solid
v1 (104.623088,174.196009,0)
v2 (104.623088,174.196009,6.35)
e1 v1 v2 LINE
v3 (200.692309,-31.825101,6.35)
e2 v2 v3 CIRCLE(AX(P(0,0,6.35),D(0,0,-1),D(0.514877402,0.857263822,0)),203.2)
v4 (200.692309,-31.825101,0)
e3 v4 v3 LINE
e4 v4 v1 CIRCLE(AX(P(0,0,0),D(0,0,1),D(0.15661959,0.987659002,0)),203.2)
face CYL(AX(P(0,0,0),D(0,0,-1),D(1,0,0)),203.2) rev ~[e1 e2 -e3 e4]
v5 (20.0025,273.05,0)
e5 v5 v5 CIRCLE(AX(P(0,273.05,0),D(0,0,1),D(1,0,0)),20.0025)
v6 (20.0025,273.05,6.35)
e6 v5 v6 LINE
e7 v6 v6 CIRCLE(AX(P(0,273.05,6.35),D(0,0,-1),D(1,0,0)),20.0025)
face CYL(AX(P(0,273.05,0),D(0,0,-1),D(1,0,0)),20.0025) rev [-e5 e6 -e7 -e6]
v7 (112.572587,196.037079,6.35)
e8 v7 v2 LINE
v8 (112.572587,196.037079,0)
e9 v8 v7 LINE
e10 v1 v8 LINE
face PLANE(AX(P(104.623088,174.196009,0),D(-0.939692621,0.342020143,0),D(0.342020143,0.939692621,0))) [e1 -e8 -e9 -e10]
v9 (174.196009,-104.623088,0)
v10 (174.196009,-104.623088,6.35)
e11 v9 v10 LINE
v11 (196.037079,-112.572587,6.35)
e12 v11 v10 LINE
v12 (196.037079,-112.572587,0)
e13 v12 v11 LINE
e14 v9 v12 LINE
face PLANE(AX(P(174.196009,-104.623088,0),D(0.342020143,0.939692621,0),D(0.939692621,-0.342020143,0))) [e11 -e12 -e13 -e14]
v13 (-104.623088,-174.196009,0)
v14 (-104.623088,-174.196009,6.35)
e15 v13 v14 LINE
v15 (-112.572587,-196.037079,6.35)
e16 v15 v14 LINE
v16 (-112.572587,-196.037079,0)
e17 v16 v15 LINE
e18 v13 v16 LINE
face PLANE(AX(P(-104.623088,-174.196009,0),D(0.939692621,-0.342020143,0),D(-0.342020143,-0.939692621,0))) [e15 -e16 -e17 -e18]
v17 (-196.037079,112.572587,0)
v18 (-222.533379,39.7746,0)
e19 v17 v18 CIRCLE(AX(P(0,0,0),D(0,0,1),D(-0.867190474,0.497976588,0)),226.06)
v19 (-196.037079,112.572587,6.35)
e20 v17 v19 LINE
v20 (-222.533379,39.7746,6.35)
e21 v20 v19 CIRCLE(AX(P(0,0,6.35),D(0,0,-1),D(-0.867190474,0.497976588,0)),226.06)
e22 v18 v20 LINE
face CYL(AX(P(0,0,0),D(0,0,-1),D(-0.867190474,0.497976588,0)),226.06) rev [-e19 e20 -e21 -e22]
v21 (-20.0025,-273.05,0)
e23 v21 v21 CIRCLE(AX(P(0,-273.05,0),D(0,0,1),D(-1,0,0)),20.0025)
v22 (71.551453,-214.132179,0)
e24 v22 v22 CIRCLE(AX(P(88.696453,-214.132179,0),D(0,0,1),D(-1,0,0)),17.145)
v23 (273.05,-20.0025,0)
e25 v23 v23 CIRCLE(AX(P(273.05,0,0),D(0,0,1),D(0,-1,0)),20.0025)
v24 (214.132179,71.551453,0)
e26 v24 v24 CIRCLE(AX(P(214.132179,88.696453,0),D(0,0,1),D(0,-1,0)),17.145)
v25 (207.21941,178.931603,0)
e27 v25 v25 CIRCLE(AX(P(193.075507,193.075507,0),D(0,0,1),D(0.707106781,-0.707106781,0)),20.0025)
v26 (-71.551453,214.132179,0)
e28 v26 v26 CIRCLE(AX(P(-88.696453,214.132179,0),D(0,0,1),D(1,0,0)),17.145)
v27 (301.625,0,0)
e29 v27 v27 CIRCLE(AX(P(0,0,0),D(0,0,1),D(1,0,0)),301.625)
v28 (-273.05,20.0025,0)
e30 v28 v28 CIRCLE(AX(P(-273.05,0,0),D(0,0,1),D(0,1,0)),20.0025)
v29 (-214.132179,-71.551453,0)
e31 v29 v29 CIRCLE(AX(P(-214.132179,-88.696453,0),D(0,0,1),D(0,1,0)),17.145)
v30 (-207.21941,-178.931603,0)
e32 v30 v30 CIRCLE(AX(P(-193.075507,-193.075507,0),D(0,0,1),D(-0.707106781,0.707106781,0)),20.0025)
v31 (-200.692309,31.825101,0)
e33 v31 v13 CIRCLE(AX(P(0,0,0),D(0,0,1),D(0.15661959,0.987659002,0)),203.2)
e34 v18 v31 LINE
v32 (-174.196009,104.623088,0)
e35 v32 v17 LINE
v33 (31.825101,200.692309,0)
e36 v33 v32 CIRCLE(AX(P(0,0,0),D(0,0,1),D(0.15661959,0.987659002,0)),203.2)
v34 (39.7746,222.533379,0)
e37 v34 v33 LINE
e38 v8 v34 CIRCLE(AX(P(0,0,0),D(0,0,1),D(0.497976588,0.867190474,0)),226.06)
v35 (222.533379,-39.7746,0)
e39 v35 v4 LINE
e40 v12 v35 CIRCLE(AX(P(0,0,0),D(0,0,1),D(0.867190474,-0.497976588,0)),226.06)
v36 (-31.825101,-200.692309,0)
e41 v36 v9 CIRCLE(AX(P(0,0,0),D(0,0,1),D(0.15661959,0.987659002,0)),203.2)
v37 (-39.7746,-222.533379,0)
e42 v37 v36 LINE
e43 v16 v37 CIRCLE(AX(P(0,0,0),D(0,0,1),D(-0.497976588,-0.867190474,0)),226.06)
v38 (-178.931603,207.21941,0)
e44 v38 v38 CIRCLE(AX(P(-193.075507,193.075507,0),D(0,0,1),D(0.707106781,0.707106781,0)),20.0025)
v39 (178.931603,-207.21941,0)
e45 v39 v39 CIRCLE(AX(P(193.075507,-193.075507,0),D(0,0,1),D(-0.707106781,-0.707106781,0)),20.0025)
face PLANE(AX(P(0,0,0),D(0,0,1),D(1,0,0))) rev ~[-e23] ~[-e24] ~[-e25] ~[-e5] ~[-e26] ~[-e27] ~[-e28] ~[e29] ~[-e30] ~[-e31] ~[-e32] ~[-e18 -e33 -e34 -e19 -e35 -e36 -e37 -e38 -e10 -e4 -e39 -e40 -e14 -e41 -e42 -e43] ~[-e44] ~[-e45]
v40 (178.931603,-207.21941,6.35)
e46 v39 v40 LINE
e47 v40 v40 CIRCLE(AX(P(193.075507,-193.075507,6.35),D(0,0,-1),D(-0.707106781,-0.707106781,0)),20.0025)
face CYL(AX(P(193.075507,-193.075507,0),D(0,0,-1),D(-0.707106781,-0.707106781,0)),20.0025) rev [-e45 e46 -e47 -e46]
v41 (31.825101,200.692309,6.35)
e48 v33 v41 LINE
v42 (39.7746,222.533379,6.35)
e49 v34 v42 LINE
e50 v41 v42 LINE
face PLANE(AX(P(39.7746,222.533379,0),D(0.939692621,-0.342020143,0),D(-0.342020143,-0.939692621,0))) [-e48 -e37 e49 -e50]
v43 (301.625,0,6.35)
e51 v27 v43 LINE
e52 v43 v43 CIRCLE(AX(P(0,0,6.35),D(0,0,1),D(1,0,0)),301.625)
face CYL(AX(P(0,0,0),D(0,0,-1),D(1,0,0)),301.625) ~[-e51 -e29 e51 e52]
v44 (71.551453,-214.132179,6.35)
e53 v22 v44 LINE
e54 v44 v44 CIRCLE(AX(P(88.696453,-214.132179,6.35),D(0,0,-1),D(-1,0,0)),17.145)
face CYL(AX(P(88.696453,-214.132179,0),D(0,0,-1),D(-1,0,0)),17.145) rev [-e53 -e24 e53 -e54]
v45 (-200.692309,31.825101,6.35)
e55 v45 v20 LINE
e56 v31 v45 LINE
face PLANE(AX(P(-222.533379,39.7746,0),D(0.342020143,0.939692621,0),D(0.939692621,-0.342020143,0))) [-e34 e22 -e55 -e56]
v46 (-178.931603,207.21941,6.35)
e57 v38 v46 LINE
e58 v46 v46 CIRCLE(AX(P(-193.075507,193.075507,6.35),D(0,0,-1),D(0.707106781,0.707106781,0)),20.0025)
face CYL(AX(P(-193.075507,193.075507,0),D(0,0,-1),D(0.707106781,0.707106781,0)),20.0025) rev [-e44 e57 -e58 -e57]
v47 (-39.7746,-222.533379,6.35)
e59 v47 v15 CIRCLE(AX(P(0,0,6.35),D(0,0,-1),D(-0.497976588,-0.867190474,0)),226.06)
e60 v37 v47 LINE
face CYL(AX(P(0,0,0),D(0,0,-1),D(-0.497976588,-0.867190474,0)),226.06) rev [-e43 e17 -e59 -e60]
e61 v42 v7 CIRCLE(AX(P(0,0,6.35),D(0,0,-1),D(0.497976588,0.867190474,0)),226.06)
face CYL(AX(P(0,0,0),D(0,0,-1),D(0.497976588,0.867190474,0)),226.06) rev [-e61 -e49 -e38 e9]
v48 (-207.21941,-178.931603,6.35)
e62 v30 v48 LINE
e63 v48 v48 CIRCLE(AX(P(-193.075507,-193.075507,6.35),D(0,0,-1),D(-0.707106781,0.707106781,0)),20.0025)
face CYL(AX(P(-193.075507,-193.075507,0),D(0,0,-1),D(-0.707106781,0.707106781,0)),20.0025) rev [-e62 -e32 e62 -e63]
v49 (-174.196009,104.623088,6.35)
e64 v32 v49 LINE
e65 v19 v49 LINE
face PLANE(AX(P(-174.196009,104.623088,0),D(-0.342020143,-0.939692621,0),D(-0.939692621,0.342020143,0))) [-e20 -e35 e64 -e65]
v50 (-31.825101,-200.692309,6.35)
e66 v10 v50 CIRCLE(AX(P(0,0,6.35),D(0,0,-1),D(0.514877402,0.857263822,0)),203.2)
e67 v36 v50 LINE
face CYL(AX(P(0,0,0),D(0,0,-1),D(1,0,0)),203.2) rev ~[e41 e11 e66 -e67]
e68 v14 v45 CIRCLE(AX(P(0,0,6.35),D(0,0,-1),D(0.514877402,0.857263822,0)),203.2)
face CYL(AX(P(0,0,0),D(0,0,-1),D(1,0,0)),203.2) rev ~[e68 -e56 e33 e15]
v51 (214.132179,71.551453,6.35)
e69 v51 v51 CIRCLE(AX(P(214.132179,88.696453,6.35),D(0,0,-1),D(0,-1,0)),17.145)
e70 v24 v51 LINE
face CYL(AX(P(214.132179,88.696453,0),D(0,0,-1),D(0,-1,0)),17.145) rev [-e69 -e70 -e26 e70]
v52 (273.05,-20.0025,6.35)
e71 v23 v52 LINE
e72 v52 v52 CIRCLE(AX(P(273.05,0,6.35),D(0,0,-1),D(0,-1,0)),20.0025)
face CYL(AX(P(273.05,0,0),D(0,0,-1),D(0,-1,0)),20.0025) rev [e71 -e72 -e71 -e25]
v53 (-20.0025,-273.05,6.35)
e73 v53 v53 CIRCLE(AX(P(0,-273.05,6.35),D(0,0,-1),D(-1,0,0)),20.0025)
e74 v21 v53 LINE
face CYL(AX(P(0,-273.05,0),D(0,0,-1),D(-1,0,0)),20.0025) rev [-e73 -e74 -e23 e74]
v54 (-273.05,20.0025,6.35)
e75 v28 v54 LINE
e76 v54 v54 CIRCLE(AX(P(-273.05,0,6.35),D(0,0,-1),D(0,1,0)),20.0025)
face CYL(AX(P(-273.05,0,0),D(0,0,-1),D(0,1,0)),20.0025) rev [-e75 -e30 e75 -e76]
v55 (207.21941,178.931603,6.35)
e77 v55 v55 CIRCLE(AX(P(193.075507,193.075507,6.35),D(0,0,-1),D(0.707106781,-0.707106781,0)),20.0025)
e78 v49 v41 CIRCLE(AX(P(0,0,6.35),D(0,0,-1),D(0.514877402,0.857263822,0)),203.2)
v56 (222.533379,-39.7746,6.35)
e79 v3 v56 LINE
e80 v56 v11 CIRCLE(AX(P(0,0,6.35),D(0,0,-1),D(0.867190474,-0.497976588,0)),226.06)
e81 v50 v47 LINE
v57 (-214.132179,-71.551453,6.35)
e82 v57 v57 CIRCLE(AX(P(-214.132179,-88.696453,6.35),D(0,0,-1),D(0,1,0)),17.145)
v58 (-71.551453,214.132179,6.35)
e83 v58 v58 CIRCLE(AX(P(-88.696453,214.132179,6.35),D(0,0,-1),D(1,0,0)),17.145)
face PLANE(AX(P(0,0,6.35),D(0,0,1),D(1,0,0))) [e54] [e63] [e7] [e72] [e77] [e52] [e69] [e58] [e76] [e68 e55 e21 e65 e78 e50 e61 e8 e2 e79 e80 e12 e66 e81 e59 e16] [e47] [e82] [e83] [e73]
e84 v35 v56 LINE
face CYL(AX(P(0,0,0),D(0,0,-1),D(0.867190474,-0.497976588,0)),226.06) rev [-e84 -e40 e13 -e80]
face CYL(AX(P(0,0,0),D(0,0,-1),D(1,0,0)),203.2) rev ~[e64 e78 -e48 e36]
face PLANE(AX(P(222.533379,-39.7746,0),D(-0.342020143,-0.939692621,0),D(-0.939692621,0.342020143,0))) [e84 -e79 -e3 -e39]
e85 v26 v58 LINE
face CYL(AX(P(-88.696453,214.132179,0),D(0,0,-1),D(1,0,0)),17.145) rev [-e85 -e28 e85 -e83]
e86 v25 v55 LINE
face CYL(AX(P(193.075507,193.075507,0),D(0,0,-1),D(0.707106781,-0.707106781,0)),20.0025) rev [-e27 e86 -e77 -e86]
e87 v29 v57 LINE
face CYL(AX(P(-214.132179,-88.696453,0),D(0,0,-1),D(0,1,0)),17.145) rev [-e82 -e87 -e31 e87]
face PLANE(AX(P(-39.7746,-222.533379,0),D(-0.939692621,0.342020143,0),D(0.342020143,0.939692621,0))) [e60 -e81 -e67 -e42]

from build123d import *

# Parameters (mm, degrees)
F0_R            = 301.625
F0_R_2          = 17.145
F0_R_3          = 20.0025
F1_DEPTH        = 6.35
F2_DEPTH        = 6.351
F2_COPIES_COUNT = 8
F3_DEPTH        = 6.351
F3_COPIES_COUNT = 4
F4_DEPTH        = 6.351
F4_COPIES_COUNT = 4


# Not quite as in the source:
# - a pattern or mirror of a feature is missing from the dataset's text; its kind, count and spacing are read off the source's solid


with BuildPart() as f1:
    # F0 (on Top) → F1 (new body)
    with BuildSketch(Plane.XY):
        Circle(F0_R)
        with Locations((-88.6964525364, 214.1321786478)):
            Circle(F0_R_2, mode=Mode.SUBTRACT)
        with BuildLine():
            ThreePointArc((104.6230881005, 174.1960086693), (176.846899184, 100.0770415679), (203.2, 0))
            ThreePointArc((203.2, 0), (-154.5268592771, -131.9533620714), (31.8251007682, 200.6923091728))
            Line((31.8251007682, 200.6923091728), (39.7746000853, 222.5333790425))
            ThreePointArc((39.7746000853, 222.5333790425), (77.3170736002, 212.4269138549), (112.5725874176, 196.037078539))
            Line((112.5725874176, 196.037078539), (104.6230881005, 174.1960086693))
        make_face(mode=Mode.SUBTRACT)
        with Locations((0, 273.05)):
            Circle(F0_R_3, mode=Mode.SUBTRACT)
        with BuildLine():
            ThreePointArc((31.8251007682, 200.6923091728), (69.4984931238, 190.9455405437), (104.6230881005, 174.1960086693))
            Line((104.6230881005, 174.1960086693), (112.5725874176, 196.037078539))
            ThreePointArc((112.5725874176, 196.037078539), (77.3170736002, 212.4269138549), (39.7746000853, 222.5333790425))
            Line((39.7746000853, 222.5333790425), (31.8251007682, 200.6923091728))
        make_face()
        with Locations((0, 273.05)):
            Circle(F0_R_3)
        with Locations((-88.6964525364, 214.1321786478)):
            Circle(F0_R_2)
    extrude(amount=F1_DEPTH)

    # F0 (on Top) → F2 (cut, through all)
    with BuildSketch(Plane.XY):
        with Locations((0, 273.05)):
            Circle(F0_R_3)
    f2 = extrude(amount=F2_DEPTH, mode=Mode.SUBTRACT)

    # F2_copies: F2 ×8 about axis
    f2_copies_axis = Axis((0, 0, 0), (0, 0, 1))
    for i in range(1, F2_COPIES_COUNT):
        add(f2.rotate(f2_copies_axis, i * 360 / F2_COPIES_COUNT), mode=Mode.SUBTRACT)

    # F0 (on Top) → F3 (cut, through all)
    with BuildSketch(Plane.XY):
        with BuildLine():
            ThreePointArc((31.8251007682, 200.6923091728), (69.4984931238, 190.9455405437), (104.6230881005, 174.1960086693))
            Line((104.6230881005, 174.1960086693), (112.5725874176, 196.037078539))
            ThreePointArc((112.5725874176, 196.037078539), (77.3170736002, 212.4269138549), (39.7746000853, 222.5333790425))
            Line((39.7746000853, 222.5333790425), (31.8251007682, 200.6923091728))
        make_face()
    f3 = extrude(amount=F3_DEPTH, mode=Mode.SUBTRACT)

    # F3_copies: F3 ×4 about axis
    f3_copies_axis = Axis((0, 0, 0), (0, 0, 1))
    for i in range(1, F3_COPIES_COUNT):
        add(f3.rotate(f3_copies_axis, i * 360 / F3_COPIES_COUNT), mode=Mode.SUBTRACT)

    # F0 (on Top) → F4 (cut, through all)
    with BuildSketch(Plane.XY):
        with Locations((-88.6964525364, 214.1321786478)):
            Circle(F0_R_2)
    f4 = extrude(amount=F4_DEPTH, mode=Mode.SUBTRACT)

    # F4_copies: F4 ×4 about axis
    f4_copies_axis = Axis((0, 0, 0), (0, 0, 1))
    for i in range(1, F4_COPIES_COUNT):
        add(f4.rotate(f4_copies_axis, i * 360 / F4_COPIES_COUNT), mode=Mode.SUBTRACT)


solid = f1.part
